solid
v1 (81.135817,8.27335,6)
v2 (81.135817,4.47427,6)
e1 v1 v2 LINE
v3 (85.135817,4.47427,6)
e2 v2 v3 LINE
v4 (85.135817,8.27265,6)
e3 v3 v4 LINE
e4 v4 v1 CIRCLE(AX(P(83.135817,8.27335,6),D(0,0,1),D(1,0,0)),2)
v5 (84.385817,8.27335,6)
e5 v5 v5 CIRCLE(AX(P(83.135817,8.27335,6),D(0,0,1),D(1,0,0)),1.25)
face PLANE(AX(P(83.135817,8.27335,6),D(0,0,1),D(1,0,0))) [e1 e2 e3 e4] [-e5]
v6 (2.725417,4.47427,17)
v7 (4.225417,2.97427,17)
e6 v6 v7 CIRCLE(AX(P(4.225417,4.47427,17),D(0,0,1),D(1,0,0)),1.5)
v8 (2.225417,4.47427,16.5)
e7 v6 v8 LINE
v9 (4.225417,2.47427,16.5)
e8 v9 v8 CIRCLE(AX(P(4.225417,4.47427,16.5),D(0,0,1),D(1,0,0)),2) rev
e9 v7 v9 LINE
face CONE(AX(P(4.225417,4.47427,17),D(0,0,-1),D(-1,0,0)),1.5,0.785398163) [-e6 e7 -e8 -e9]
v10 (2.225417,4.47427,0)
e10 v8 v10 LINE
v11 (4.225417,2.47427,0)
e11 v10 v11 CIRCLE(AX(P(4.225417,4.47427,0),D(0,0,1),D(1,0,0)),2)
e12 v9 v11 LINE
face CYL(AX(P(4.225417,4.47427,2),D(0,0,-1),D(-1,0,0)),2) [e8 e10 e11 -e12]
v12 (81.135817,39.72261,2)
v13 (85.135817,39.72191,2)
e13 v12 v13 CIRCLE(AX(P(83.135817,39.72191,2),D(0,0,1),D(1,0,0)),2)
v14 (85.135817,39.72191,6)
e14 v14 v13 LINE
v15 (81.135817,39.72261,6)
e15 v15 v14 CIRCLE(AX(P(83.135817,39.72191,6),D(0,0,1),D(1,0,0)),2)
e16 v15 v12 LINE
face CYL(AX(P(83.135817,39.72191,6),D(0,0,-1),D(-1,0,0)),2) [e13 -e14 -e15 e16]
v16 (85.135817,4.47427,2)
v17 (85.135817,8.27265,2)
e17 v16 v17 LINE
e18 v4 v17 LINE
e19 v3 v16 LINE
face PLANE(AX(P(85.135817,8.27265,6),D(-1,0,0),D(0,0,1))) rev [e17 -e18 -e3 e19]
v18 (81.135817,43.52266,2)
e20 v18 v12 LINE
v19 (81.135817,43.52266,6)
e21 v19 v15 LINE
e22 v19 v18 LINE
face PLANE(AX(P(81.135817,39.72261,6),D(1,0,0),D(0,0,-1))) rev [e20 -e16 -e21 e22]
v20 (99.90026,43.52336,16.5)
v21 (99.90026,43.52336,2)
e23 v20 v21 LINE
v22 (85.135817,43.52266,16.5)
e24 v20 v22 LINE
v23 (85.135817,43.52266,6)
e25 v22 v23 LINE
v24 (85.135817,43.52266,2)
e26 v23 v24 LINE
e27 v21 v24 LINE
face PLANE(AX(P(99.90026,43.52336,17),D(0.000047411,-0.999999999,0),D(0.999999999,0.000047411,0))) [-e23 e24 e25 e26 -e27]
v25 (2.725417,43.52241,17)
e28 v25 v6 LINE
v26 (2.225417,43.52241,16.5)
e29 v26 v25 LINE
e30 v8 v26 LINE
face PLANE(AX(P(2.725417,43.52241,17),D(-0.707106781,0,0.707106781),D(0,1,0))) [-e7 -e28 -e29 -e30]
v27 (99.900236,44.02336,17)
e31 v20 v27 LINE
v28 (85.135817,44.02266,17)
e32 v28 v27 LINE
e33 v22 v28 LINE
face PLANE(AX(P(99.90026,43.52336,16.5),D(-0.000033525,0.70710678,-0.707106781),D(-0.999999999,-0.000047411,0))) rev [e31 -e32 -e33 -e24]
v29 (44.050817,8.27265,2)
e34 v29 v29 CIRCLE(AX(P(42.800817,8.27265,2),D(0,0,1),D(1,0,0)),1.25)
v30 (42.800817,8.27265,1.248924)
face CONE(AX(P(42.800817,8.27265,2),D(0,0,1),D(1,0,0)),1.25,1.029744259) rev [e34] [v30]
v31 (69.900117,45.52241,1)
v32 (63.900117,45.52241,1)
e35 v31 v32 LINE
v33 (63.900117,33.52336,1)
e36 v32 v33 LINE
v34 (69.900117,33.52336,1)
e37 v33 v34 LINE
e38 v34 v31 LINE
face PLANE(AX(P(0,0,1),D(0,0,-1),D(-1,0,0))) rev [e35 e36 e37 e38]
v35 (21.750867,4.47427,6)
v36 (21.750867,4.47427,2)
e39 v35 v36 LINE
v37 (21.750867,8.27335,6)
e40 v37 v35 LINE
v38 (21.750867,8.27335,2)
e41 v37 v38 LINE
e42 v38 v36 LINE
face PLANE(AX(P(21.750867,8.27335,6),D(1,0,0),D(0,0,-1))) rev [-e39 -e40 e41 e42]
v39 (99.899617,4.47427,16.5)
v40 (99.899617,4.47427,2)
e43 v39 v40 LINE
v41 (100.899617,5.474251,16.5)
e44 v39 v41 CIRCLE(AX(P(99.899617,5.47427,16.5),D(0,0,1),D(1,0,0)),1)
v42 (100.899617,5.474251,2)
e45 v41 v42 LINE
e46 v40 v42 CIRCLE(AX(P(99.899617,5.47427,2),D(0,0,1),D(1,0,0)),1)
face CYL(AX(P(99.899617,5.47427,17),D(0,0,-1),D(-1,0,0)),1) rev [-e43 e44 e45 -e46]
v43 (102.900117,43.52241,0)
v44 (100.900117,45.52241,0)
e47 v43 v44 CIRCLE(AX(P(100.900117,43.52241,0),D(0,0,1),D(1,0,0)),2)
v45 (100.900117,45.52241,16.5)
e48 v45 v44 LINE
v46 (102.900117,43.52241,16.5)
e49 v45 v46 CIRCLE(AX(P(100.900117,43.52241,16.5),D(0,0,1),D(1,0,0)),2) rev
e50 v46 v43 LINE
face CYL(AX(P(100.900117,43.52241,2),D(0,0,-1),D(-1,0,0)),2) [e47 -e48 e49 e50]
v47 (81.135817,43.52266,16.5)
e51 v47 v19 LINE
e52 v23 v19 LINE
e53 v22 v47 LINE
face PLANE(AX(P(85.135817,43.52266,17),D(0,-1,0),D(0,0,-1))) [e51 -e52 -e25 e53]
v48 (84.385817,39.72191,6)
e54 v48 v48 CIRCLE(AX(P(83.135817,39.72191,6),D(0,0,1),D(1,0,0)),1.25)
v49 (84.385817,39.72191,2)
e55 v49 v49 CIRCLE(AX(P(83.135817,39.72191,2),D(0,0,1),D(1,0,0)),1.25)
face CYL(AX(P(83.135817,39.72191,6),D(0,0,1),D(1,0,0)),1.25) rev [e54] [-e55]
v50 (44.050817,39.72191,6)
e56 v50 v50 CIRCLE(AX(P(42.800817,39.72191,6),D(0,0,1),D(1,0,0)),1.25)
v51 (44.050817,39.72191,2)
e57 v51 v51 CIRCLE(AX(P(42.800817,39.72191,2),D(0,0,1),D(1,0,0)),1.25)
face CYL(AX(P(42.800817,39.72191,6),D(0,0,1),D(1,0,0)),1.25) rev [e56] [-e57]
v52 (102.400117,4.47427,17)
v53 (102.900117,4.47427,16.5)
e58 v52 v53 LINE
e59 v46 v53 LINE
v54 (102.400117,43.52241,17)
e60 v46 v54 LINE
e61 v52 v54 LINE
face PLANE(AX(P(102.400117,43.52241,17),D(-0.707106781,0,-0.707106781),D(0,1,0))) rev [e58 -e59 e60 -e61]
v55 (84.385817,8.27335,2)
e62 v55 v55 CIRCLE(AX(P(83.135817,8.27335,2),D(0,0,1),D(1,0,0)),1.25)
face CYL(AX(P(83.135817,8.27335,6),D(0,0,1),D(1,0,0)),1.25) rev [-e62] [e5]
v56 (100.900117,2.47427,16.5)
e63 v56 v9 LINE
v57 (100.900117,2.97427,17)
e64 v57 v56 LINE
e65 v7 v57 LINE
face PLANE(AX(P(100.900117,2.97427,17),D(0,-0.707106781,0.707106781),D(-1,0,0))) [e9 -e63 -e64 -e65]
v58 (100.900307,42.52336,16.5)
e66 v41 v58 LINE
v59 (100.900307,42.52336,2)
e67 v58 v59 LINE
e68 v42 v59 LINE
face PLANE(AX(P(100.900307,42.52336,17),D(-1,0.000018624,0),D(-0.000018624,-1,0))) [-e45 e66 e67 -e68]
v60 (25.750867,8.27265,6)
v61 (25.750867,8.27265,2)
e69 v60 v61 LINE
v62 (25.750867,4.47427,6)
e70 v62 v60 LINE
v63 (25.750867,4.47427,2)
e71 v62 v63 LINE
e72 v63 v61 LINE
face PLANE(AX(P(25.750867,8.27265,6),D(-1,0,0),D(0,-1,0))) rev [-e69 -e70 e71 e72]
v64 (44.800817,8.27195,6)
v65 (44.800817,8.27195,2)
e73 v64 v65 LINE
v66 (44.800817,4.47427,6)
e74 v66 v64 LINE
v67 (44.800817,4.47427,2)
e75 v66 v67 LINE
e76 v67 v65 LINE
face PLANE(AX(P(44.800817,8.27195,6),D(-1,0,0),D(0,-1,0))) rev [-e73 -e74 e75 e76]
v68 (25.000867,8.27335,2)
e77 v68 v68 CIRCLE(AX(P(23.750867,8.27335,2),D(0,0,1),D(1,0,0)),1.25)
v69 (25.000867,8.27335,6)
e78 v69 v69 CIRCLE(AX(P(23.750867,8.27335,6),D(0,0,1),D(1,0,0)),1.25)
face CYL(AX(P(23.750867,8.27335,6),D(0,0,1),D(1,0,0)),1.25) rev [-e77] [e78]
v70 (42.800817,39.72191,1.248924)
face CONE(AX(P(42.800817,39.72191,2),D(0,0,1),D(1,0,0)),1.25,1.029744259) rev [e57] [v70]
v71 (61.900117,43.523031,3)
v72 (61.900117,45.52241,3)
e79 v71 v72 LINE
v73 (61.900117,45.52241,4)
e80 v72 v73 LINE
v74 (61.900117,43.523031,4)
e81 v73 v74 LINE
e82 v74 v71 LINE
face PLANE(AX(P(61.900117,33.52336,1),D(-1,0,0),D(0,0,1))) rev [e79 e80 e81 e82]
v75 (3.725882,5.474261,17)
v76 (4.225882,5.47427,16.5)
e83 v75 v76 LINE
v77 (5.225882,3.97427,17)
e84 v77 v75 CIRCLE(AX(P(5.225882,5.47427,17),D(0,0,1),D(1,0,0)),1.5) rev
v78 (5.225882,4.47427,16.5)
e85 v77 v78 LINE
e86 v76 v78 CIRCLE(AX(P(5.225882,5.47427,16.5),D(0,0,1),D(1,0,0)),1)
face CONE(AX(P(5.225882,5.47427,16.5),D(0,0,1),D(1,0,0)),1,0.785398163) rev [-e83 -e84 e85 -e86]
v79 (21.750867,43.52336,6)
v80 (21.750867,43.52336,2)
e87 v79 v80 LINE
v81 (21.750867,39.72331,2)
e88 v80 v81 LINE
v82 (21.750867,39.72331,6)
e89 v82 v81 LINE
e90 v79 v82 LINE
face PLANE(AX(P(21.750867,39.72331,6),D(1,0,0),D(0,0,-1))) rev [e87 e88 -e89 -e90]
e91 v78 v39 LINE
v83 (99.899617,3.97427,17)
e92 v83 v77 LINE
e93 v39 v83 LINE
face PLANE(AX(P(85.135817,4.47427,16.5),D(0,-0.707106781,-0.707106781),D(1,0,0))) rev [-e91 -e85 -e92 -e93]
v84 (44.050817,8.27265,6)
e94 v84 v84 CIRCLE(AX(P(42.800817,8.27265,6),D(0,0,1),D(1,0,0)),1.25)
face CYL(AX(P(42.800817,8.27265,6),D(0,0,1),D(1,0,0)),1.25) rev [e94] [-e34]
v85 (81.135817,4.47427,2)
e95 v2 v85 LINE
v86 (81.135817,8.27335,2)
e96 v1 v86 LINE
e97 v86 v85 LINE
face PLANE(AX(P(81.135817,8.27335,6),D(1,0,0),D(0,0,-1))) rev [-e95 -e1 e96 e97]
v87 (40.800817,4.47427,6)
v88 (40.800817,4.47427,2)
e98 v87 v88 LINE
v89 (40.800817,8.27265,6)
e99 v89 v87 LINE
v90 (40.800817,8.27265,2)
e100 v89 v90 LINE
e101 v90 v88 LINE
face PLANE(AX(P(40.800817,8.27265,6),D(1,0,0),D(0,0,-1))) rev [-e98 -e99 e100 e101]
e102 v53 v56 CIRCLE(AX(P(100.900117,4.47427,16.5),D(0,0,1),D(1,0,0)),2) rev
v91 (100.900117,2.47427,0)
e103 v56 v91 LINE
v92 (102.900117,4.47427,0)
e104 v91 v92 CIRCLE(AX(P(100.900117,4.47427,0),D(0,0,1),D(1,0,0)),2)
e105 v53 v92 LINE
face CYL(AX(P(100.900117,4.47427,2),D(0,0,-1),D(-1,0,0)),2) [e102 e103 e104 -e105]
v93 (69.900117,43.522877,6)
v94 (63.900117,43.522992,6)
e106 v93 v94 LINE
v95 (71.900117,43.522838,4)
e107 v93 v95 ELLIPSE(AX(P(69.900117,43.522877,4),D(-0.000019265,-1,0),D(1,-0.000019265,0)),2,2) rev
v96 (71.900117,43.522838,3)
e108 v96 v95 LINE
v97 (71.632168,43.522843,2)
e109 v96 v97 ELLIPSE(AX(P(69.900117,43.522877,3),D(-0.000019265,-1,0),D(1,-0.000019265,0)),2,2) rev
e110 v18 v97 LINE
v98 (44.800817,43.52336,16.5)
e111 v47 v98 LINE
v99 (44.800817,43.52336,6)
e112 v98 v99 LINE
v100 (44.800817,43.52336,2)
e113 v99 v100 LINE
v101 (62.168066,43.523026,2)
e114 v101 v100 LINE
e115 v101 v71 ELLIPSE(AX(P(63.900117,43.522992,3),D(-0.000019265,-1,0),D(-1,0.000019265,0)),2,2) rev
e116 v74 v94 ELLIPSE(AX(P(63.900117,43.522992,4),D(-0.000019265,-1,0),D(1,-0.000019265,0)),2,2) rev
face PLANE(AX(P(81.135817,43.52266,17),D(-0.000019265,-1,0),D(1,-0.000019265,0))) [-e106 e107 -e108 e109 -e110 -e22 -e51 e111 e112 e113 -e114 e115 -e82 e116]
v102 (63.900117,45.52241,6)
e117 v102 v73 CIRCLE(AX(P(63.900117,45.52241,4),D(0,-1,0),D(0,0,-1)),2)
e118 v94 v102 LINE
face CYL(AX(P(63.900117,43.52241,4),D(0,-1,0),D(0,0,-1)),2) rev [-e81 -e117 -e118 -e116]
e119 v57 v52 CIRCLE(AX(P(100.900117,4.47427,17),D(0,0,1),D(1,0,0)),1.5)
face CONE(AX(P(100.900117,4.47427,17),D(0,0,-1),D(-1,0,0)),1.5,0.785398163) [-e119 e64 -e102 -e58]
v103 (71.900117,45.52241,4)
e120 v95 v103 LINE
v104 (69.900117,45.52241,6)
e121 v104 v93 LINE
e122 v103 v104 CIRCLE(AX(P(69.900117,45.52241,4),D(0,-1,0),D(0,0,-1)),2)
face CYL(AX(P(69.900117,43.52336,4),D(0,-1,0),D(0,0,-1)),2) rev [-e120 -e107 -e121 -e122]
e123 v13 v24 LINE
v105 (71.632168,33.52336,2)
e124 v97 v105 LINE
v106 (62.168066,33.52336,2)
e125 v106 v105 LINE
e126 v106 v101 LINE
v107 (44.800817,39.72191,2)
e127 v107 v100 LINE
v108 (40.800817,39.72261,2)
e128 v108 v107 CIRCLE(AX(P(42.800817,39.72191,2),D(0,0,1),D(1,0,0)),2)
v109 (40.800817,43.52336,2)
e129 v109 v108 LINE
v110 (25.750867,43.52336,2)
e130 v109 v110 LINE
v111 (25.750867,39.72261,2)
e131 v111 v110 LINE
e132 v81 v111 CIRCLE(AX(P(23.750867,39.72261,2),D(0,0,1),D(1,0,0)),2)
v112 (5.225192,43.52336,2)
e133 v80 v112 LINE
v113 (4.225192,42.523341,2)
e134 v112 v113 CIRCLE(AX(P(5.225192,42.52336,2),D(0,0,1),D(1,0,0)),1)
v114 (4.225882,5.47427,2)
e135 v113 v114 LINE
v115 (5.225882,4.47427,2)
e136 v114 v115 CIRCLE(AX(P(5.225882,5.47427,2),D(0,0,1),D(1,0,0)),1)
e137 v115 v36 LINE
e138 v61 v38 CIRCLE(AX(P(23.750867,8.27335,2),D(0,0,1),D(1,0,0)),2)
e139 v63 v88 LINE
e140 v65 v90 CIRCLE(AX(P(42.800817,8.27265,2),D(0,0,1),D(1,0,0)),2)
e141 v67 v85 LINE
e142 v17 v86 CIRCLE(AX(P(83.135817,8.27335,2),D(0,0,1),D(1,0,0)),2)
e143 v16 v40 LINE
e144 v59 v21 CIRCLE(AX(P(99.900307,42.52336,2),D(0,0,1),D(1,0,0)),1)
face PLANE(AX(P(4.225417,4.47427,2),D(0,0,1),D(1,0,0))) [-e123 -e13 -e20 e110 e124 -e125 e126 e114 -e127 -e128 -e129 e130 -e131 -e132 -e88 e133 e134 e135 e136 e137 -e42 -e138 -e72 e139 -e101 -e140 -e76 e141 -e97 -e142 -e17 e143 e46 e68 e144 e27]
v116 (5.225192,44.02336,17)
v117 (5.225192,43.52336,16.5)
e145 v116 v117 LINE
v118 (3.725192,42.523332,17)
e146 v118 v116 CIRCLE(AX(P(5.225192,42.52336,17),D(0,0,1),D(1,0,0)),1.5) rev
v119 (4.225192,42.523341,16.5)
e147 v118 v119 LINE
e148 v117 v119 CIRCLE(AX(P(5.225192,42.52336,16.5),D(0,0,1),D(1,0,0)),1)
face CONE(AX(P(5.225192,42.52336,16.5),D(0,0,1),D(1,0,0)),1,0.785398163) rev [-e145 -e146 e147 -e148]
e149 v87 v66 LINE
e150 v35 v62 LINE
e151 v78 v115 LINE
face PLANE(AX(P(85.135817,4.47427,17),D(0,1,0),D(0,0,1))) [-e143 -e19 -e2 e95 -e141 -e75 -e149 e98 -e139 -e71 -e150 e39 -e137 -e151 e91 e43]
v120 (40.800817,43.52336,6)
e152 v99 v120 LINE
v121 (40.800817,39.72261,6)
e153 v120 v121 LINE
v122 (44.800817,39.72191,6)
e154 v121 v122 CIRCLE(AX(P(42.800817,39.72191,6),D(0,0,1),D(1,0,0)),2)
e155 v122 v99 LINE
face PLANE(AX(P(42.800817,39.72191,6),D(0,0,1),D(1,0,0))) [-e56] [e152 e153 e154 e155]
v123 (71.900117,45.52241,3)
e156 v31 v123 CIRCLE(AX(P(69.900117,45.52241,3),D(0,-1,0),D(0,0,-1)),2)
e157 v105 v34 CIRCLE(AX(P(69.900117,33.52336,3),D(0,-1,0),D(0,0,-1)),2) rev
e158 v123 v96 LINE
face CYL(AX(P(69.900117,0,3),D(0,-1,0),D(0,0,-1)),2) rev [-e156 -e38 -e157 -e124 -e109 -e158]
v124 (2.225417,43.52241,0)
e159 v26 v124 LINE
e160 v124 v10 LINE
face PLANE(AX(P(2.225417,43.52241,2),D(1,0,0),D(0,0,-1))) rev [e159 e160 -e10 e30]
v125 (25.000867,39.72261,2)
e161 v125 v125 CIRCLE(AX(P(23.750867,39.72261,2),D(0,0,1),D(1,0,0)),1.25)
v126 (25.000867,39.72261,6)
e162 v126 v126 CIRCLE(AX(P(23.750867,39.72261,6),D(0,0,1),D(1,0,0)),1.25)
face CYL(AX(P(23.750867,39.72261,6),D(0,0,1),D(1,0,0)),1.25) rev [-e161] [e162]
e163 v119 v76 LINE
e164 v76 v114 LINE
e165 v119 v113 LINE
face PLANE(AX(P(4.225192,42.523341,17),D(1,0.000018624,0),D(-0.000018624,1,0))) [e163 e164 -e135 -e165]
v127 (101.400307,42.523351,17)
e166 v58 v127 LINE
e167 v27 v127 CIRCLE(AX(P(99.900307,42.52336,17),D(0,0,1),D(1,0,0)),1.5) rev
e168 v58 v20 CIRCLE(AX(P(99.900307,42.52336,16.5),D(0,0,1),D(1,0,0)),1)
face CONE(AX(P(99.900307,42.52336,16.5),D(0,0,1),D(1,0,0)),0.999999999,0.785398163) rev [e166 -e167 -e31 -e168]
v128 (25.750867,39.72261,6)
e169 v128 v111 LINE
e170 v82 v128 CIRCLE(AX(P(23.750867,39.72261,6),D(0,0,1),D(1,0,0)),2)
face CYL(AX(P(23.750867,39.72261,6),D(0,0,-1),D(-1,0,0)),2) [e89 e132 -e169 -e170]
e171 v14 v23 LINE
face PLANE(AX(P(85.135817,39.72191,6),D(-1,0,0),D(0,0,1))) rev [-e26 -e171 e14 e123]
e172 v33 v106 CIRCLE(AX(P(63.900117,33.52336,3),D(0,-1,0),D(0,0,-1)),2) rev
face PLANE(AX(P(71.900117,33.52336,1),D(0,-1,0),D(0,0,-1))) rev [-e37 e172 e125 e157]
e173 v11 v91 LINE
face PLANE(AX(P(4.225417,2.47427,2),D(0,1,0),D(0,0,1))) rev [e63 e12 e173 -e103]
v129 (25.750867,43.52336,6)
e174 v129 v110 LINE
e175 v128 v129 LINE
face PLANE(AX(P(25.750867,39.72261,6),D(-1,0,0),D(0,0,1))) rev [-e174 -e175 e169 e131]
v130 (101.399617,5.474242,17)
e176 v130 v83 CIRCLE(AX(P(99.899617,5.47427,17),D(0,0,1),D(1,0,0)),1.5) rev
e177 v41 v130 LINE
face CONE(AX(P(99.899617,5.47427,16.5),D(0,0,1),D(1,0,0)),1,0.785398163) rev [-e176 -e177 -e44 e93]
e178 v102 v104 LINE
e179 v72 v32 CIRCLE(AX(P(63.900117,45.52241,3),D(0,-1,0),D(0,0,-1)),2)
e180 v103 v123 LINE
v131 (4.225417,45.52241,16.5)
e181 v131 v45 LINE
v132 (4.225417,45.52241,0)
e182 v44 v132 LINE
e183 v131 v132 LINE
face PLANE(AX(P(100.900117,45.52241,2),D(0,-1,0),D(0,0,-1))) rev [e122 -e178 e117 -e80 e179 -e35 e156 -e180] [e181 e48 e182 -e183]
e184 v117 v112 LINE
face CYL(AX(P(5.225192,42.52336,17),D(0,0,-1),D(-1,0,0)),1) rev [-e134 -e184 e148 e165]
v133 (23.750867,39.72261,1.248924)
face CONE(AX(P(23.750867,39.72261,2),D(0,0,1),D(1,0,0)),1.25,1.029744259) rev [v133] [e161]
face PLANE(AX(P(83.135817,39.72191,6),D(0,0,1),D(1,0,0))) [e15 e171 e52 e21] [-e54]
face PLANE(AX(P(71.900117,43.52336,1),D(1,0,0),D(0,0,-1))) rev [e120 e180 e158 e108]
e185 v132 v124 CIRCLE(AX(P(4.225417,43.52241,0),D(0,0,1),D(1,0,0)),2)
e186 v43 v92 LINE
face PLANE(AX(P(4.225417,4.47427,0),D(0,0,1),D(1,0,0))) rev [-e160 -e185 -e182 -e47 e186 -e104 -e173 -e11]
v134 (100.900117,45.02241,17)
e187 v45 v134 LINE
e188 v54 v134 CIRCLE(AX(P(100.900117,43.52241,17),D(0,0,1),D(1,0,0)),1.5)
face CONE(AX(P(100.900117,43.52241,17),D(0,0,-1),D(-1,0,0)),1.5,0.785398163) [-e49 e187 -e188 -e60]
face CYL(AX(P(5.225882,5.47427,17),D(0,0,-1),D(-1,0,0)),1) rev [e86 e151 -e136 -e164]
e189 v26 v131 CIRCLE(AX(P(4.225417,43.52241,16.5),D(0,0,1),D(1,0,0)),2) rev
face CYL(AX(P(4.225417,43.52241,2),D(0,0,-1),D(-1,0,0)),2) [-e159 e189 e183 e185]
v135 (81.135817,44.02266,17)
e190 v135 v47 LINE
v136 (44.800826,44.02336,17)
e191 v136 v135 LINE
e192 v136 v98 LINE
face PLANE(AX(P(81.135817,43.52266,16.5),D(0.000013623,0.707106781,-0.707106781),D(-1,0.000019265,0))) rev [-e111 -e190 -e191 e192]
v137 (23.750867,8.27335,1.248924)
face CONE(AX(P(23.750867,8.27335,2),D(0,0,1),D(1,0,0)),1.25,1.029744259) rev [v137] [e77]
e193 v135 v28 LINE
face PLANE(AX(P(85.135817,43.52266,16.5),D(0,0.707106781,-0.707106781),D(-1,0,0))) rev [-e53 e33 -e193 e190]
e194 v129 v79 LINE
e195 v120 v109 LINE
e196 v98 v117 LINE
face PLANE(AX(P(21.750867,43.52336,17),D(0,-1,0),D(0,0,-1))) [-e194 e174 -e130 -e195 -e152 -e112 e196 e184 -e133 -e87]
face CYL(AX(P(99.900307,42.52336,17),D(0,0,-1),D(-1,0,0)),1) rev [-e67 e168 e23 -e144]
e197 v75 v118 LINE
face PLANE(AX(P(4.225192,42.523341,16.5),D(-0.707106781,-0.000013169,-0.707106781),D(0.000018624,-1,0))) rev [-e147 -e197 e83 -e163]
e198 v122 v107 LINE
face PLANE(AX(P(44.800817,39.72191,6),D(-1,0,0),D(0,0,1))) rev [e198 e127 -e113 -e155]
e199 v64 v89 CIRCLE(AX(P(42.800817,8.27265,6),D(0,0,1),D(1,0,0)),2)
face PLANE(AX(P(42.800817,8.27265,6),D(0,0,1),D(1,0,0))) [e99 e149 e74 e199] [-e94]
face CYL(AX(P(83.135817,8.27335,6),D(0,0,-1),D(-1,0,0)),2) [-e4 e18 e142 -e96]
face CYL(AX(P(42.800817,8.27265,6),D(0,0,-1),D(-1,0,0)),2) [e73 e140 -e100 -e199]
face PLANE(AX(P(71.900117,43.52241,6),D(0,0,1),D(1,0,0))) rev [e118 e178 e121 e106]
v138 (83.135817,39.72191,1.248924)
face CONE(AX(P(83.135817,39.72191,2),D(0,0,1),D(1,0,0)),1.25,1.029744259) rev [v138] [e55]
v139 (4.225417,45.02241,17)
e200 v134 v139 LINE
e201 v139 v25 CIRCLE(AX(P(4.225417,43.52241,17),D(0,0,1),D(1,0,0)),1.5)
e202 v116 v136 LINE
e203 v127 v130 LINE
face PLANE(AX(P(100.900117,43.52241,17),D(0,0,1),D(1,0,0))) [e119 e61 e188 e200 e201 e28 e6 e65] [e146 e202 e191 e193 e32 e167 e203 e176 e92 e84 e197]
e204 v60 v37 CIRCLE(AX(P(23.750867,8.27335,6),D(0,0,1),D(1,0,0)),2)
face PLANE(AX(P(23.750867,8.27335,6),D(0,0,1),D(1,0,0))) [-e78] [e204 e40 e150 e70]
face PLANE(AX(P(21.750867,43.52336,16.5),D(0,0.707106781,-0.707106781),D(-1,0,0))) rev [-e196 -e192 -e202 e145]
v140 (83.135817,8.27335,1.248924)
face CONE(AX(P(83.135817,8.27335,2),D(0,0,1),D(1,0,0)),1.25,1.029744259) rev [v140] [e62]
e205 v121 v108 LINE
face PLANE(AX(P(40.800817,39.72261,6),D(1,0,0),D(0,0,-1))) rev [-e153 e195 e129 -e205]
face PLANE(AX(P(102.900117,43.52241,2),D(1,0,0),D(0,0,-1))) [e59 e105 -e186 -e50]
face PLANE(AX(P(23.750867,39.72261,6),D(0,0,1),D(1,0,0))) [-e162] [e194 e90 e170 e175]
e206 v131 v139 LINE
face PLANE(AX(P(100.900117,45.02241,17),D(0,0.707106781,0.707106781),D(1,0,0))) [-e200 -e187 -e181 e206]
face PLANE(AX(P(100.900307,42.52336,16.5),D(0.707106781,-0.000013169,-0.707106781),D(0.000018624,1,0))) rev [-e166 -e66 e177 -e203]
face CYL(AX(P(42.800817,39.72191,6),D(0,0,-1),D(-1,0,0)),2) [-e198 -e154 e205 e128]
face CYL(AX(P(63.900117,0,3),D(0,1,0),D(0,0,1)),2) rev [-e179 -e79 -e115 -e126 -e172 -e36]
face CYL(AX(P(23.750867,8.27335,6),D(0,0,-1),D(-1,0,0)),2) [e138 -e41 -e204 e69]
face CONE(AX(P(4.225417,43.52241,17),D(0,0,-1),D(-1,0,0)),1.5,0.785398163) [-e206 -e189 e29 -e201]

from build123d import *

# Parameters (mm, degrees)
EXTRUDE_1_DEPTH     = 2
SKETCH_2_W          = 10
SKETCH_2_H          = 10
CUT_EXTRUDE_1_DEPTH = 1
EXTRUDE_2_DEPTH     = 15
EXTRUDE_3_DEPTH     = 4
MM_2_D              = 2.5
MM_2_DEPTH          = 4
MM_2_TIP            = 0.751075774
SKETCH_9_W          = 10
SKETCH_9_H          = 5
CUT_EXTRUDE_2_DEPTH = 2
FILLET_1_R          = 2
CHAMFER_1_SIZE      = 0.5


with BuildPart() as part:
    # 草图1 → 凸台-拉伸1 (new body)
    with BuildSketch(Plane.XY):
        with BuildLine():
            Line((2.225416965, 43.522410124), (2.225416965, 4.474270124))
            ThreePointArc((2.225416965, 4.474270124), (2.811203402, 3.060056561), (4.225416965, 2.474270124))
            Line((4.225416965, 2.474270124), (100.900116965, 2.474270124))
            ThreePointArc((100.900116965, 2.474270124), (102.314330527, 3.060056561), (102.900116965, 4.474270124))
            Line((102.900116965, 4.474270124), (102.900116965, 43.522410124))
            ThreePointArc((102.900116965, 43.522410124), (102.314330527, 44.936623686), (100.900116965, 45.522410124))
            Line((100.900116965, 45.522410124), (4.225416965, 45.522410124))
            ThreePointArc((4.225416965, 45.522410124), (2.811203402, 44.936623686), (2.225416965, 43.522410124))
        make_face()
    extrude(amount=EXTRUDE_1_DEPTH)

    # 草图2 → 切除-拉伸1 (cut)
    with BuildSketch(Plane.XY.offset(2)):
        with Locations((66.900116965, 38.523360124)):
            Rectangle(SKETCH_2_W, SKETCH_2_H)
    extrude(amount=-CUT_EXTRUDE_1_DEPTH, mode=Mode.SUBTRACT)

    # 草图3 → 凸台-拉伸2 (add)
    with BuildSketch(Plane.XY.offset(2)):
        with BuildLine():
            Line((100.900116965, 45.522410124), (4.225416965, 45.522410124))
            ThreePointArc((4.225416965, 45.522410124), (2.811203402, 44.936623686), (2.225416965, 43.522410124))
            Line((2.225416965, 43.522410124), (2.225416965, 4.474270124))
            ThreePointArc((2.225416965, 4.474270124), (2.811203402, 3.060056561), (4.225416965, 2.474270124))
            Line((4.225416965, 2.474270124), (100.900116965, 2.474270124))
            ThreePointArc((100.900116965, 2.474270124), (102.314330527, 3.060056561), (102.900116965, 4.474270124))
            Line((102.900116965, 4.474270124), (102.900116965, 43.522410124))
            ThreePointArc((102.900116965, 43.522410124), (102.314330527, 44.936623686), (100.900116965, 45.522410124))
        make_face()
        with BuildLine():
            Line((99.900259554, 43.523360121), (85.135816842, 43.522660124))
            Line((85.135816842, 43.522660124), (81.135817087, 43.522660124))
            Line((81.135817087, 43.522660124), (44.800816842, 43.523360124))
            Line((44.800816842, 43.523360124), (40.800817087, 43.523360124))
            Line((40.800817087, 43.523360124), (25.750866842, 43.523360124))
            Line((25.750866842, 43.523360124), (21.750867087, 43.523360124))
            Line((21.750867087, 43.523360124), (5.225191965, 43.523360124))
            ThreePointArc((5.225191965, 43.523360124), (4.518078599, 43.23046032), (4.225191965, 42.5233415))
            Line((4.225191965, 42.5233415), (4.225881965, 5.474270124))
            ThreePointArc((4.225881965, 5.474270124), (4.518775184, 4.767163343), (5.225881965, 4.474270124))
            Line((5.225881965, 4.474270124), (21.750867087, 4.474270124))
            Line((21.750867087, 4.474270124), (25.750866842, 4.474270124))
            Line((25.750866842, 4.474270124), (40.800817087, 4.474270124))
            Line((40.800817087, 4.474270124), (44.800816842, 4.474270124))
            Line((44.800816842, 4.474270124), (81.135817087, 4.474270124))
            Line((81.135817087, 4.474270124), (85.135816842, 4.474270124))
            Line((85.135816842, 4.474270124), (99.899616965, 4.474270124))
            ThreePointArc((99.899616965, 4.474270124), (100.606717161, 4.767156758), (100.899616964, 5.4742515))
            Line((100.899616964, 5.4742515), (100.900306965, 42.523360124))
            ThreePointArc((100.900306965, 42.523360124), (100.607396983, 43.230483666), (99.900259554, 43.523360121))
        make_face(mode=Mode.SUBTRACT)
    extrude(amount=EXTRUDE_2_DEPTH)

    # 草图4 → 凸台-拉伸3 (add)
    with BuildSketch(Plane.XY.offset(2)):
        with BuildLine():
            Line((21.750867087, 39.723310124), (21.750867087, 43.523360124))
            Line((21.750867087, 43.523360124), (25.750866842, 43.523360124))
            Line((25.750866842, 43.523360124), (25.750866842, 39.722610124))
            ThreePointArc((25.750866842, 39.722610124), (23.750516904, 37.722610216), (21.750867087, 39.723310124))
        make_face()
        with BuildLine():
            Line((40.800817087, 39.722610124), (40.800817087, 43.523360124))
            Line((40.800817087, 43.523360124), (44.800816842, 43.523360124))
            Line((44.800816842, 43.523360124), (44.800816842, 39.721910124))
            ThreePointArc((44.800816842, 39.721910124), (42.800466904, 37.721910216), (40.800817087, 39.722610124))
        make_face()
        with BuildLine():
            Line((81.135817087, 39.722610124), (81.135817087, 43.522660124))
            Line((81.135817087, 43.522660124), (85.135816842, 43.522660124))
            Line((85.135816842, 43.522660124), (85.135816842, 39.721910124))
            ThreePointArc((85.135816842, 39.721910124), (83.135466904, 37.721910216), (81.135817087, 39.722610124))
        make_face()
        with BuildLine():
            Line((21.750867087, 8.273350124), (21.750867087, 4.474270124))
            Line((21.750867087, 4.474270124), (25.750866842, 4.474270124))
            Line((25.750866842, 4.474270124), (25.750866842, 8.272650124))
            ThreePointArc((25.750866842, 8.272650124), (23.751217026, 10.273350032), (21.750867087, 8.273350124))
        make_face()
        with BuildLine():
            Line((40.800817087, 8.272650124), (40.800817087, 4.474270124))
            Line((40.800817087, 4.474270124), (44.800816842, 4.474270124))
            Line((44.800816842, 4.474270124), (44.800816842, 8.271950124))
            ThreePointArc((44.800816842, 8.271950124), (42.801167026, 10.272650032), (40.800817087, 8.272650124))
        make_face()
        with BuildLine():
            Line((81.135817087, 8.273350124), (81.135817087, 4.474270124))
            Line((81.135817087, 4.474270124), (85.135816842, 4.474270124))
            Line((85.135816842, 4.474270124), (85.135816842, 8.272650124))
            ThreePointArc((85.135816842, 8.272650124), (83.136167026, 10.273350032), (81.135817087, 8.273350124))
        make_face()
    extrude(amount=EXTRUDE_3_DEPTH)

    # 大小mm 暗销孔2
    with Locations(Plane(origin=(23.750866904, 39.722610124, 6), x_dir=(1, 0, 0), z_dir=(0, 0, 1))):
        with Locations((0, 0), (19.04995, -0.0007), (59.38495, -0.0007), (59.384950122, -31.44926), (19.049950122, -31.44996), (1.22e-07, -31.44926)):
            Hole(MM_2_D / 2, depth=MM_2_DEPTH)
            with Locations((0, 0, -(MM_2_DEPTH + MM_2_TIP / 2))):  # 118° drill point
                Cone(0, MM_2_D / 2, MM_2_TIP, mode=Mode.SUBTRACT)

    # 草图9 → 切除-拉伸2 (cut)
    with BuildSketch(Plane(origin=(0, 45.522410124, 0), x_dir=(1, 0, 0), z_dir=(0, 1, 0))):
        with Locations((66.900116965, -3.5)):
            Rectangle(SKETCH_9_W, SKETCH_9_H)
    extrude(amount=-CUT_EXTRUDE_2_DEPTH, mode=Mode.SUBTRACT)

    # 圆角1
    # the kernel refuses this fillet: 2 mm, written as the material it adds along each edge
    with BuildSketch(Plane(origin=(61.900116965, 45.522410124, 6), x_dir=(0, 0, -1), z_dir=(0, -1, 0))) as fillet_1_piece_1_section:
        with BuildLine():
            CenterArc((FILLET_1_R, FILLET_1_R), FILLET_1_R, 180, 90)
            Line((0, FILLET_1_R), (0, 0))
            Line((0, 0), (FILLET_1_R, 0))
        make_face()
    fillet_1_piece_1 = extrude(amount=6.999379421, mode=Mode.PRIVATE)
    fillet_1_piece_1 = split(fillet_1_piece_1, bisect_by=Plane(origin=(62.352889725, 43.52302198, 5.54721083), z_dir=(1.9265171188797207e-05, 0.9999999998144267, 0)), keep=Keep.TOP, mode=Mode.PRIVATE)
    add(fillet_1_piece_1)
    with BuildSketch(Plane(origin=(71.900116965, 45.522410124, 6), x_dir=(-1, 0, 0), z_dir=(0, -1, 0))) as fillet_1_piece_2_section:
        with BuildLine():
            CenterArc((FILLET_1_R, FILLET_1_R), FILLET_1_R, 180, 90)
            Line((0, FILLET_1_R), (0, 0))
            Line((0, 0), (FILLET_1_R, 0))
        make_face()
    fillet_1_piece_2 = extrude(amount=6.999572073, mode=Mode.PRIVATE)
    fillet_1_piece_2 = split(fillet_1_piece_2, bisect_by=Plane(origin=(71.447309266, 43.522846774, 5.547208713), z_dir=(1.9265171188797207e-05, 0.9999999998144267, 0)), keep=Keep.TOP, mode=Mode.PRIVATE)
    add(fillet_1_piece_2)
    with BuildSketch(Plane(origin=(71.900116965, 28.523360124, 1), x_dir=(0, 0, 1), z_dir=(0, 1, 0))) as fillet_1_piece_3_section:
        with BuildLine():
            CenterArc((FILLET_1_R, -FILLET_1_R), FILLET_1_R, 90, 90)
            Line((0, -FILLET_1_R), (0, 0))
            Line((0, 0), (FILLET_1_R, 0))
        make_face()
    fillet_1_piece_3 = extrude(amount=16.99905, mode=Mode.PRIVATE)
    fillet_1_piece_3 = split(fillet_1_piece_3, bisect_by=Plane(origin=(71.389876845, 33.523360124, 1.328783529), z_dir=(0, -1, 0)), keep=Keep.TOP, mode=Mode.PRIVATE)
    fillet_1_piece_3 = split(fillet_1_piece_3, bisect_by=Plane(origin=(71.389876845, 31.023360124, 2), z_dir=(0, 0, -1)), keep=Keep.TOP, mode=Mode.PRIVATE)
    add(fillet_1_piece_3)
    with BuildSketch(Plane(origin=(71.900116965, 33.523360124, 1), x_dir=(0, 0, 1), z_dir=(0, 1, 0))) as fillet_1_piece_4_section:
        with BuildLine():
            CenterArc((FILLET_1_R, -FILLET_1_R), FILLET_1_R, 90, 90)
            Line((0, -FILLET_1_R), (0, 0))
            Line((0, 0), (FILLET_1_R, 0))
        make_face()
    fillet_1_piece_4 = extrude(amount=11.99905, mode=Mode.PRIVATE)
    fillet_1_piece_4 = split(fillet_1_piece_4, bisect_by=Plane(origin=(71.389876488, 38.523104002, 2), z_dir=(0, 0, -1)), keep=Keep.TOP, mode=Mode.PRIVATE)
    fillet_1_piece_4 = split(fillet_1_piece_4, bisect_by=Plane(origin=(71.389972809, 43.522847879, 1.3287834), z_dir=(-1.9265171188797207e-05, -0.9999999998144267, 0)), keep=Keep.TOP, mode=Mode.PRIVATE)
    add(fillet_1_piece_4)
    with BuildSketch(Plane(origin=(71.900116965, 33.523360124, 1), x_dir=(0, 0, 1), z_dir=(0, 1, 0))) as fillet_1_piece_5_section:
        with BuildLine():
            CenterArc((FILLET_1_R, -FILLET_1_R), FILLET_1_R, 90, 90)
            Line((0, -FILLET_1_R), (0, 0))
            Line((0, 0), (FILLET_1_R, 0))
        make_face()
    fillet_1_piece_5 = extrude(amount=11.99905, mode=Mode.PRIVATE)
    fillet_1_piece_5 = split(fillet_1_piece_5, bisect_by=Plane(origin=(71.852100247, 44.52262455, 2), z_dir=(0, 0, 1)), keep=Keep.TOP, mode=Mode.PRIVATE)
    fillet_1_piece_5 = split(fillet_1_piece_5, bisect_by=Plane(origin=(71.852080986, 43.522838976, 2.326501665), z_dir=(1.9265171188797207e-05, 0.9999999998144267, 0)), keep=Keep.TOP, mode=Mode.PRIVATE)
    add(fillet_1_piece_5)
    with BuildSketch(Plane(origin=(71.900116965, 33.523360124, 1), x_dir=(0, 0, 1), z_dir=(0, 1, 0))) as fillet_1_piece_6_section:
        with BuildLine():
            CenterArc((FILLET_1_R, -FILLET_1_R), FILLET_1_R, 90, 90)
            Line((0, -FILLET_1_R), (0, 0))
            Line((0, 0), (FILLET_1_R, 0))
        make_face()
    fillet_1_piece_6 = extrude(amount=11.99905, mode=Mode.PRIVATE)
    fillet_1_piece_6 = split(fillet_1_piece_6, bisect_by=Plane(origin=(71.389878628, 44.522629002, 2), z_dir=(0, 0, -1)), keep=Keep.TOP, mode=Mode.PRIVATE)
    fillet_1_piece_6 = split(fillet_1_piece_6, bisect_by=Plane(origin=(71.389859367, 43.522847881, 1.328784171), z_dir=(1.9265171188797207e-05, 0.9999999998144267, 0)), keep=Keep.TOP, mode=Mode.PRIVATE)
    add(fillet_1_piece_6)
    with BuildSketch(Plane(origin=(61.900116965, 45.522410124, 1), x_dir=(0, 0, 1), z_dir=(0, -1, 0))) as fillet_1_piece_7_section:
        with BuildLine():
            CenterArc((FILLET_1_R, -FILLET_1_R), FILLET_1_R, 90, 90)
            Line((0, -FILLET_1_R), (0, 0))
            Line((0, 0), (FILLET_1_R, 0))
        make_face()
    fillet_1_piece_7 = extrude(amount=11.99905, mode=Mode.PRIVATE)
    fillet_1_piece_7 = split(fillet_1_piece_7, bisect_by=Plane(origin=(61.948114515, 43.523029778, 2.326501473), z_dir=(1.9265171188797207e-05, 0.9999999998144267, 0)), keep=Keep.TOP, mode=Mode.PRIVATE)
    fillet_1_piece_7 = split(fillet_1_piece_7, bisect_by=Plane(origin=(61.948133774, 44.522719951, 2), z_dir=(0, 0, 1)), keep=Keep.TOP, mode=Mode.PRIVATE)
    add(fillet_1_piece_7)
    with BuildSketch(Plane(origin=(61.900116965, 45.522410124, 1), x_dir=(0, 0, 1), z_dir=(0, -1, 0))) as fillet_1_piece_8_section:
        with BuildLine():
            CenterArc((FILLET_1_R, -FILLET_1_R), FILLET_1_R, 90, 90)
            Line((0, -FILLET_1_R), (0, 0))
            Line((0, 0), (FILLET_1_R, 0))
        make_face()
    fillet_1_piece_8 = extrude(amount=11.99905, mode=Mode.PRIVATE)
    fillet_1_piece_8 = split(fillet_1_piece_8, bisect_by=Plane(origin=(62.410339609, 43.523020873, 1.328782886), z_dir=(1.9265171188797207e-05, 0.9999999998144267, 0)), keep=Keep.TOP, mode=Mode.PRIVATE)
    fillet_1_piece_8 = split(fillet_1_piece_8, bisect_by=Plane(origin=(62.410358868, 44.522715498, 2), z_dir=(0, 0, -1)), keep=Keep.TOP, mode=Mode.PRIVATE)
    add(fillet_1_piece_8)
    with BuildSketch(Plane(origin=(61.900116965, 45.522410124, 1), x_dir=(0, 0, 1), z_dir=(0, -1, 0))) as fillet_1_piece_9_section:
        with BuildLine():
            CenterArc((FILLET_1_R, -FILLET_1_R), FILLET_1_R, 90, 90)
            Line((0, -FILLET_1_R), (0, 0))
            Line((0, 0), (FILLET_1_R, 0))
        make_face()
    fillet_1_piece_9 = extrude(amount=11.99905, mode=Mode.PRIVATE)
    fillet_1_piece_9 = split(fillet_1_piece_9, bisect_by=Plane(origin=(62.410453051, 43.523020871, 1.328783657), z_dir=(-1.9265171188797207e-05, -0.9999999998144267, 0)), keep=Keep.TOP, mode=Mode.PRIVATE)
    fillet_1_piece_9 = split(fillet_1_piece_9, bisect_by=Plane(origin=(62.410356728, 38.523190498, 2), z_dir=(0, 0, -1)), keep=Keep.TOP, mode=Mode.PRIVATE)
    add(fillet_1_piece_9)
    with BuildSketch(Plane(origin=(61.900116965, 45.522410124, 1), x_dir=(0, 0, 1), z_dir=(0, -1, 0))) as fillet_1_piece_10_section:
        with BuildLine():
            CenterArc((FILLET_1_R, -FILLET_1_R), FILLET_1_R, 90, 90)
            Line((0, -FILLET_1_R), (0, 0))
            Line((0, 0), (FILLET_1_R, 0))
        make_face()
    fillet_1_piece_10 = extrude(amount=16.99905, mode=Mode.PRIVATE)
    fillet_1_piece_10 = split(fillet_1_piece_10, bisect_by=Plane(origin=(62.410357085, 31.023360124, 2), z_dir=(0, 0, -1)), keep=Keep.TOP, mode=Mode.PRIVATE)
    fillet_1_piece_10 = split(fillet_1_piece_10, bisect_by=Plane(origin=(62.410357085, 33.523360124, 1.328783529), z_dir=(0, -1, 0)), keep=Keep.TOP, mode=Mode.PRIVATE)
    add(fillet_1_piece_10)

    # 倒角1
    chamfer_1_edges = [part.edges().sort_by_distance(p)[0] for p in [
        (102.314330527, 44.936623686, 17),
        (52.562766965, 45.522410124, 17),
        (2.811203402, 44.936623686, 17),
        (2.225416965, 23.998340124, 17),
        (2.811203402, 3.060056561, 17),
        (52.562766965, 2.474270124, 17),
        (102.314330527, 3.060056561, 17),
        (102.900116965, 23.998340124, 17),
        (100.607396983, 43.230483666, 17),
        (92.518038198, 43.523010123, 17),
        (83.135816965, 43.522660124, 17),
        (62.968316965, 43.523010124, 17),
        (25.013004404, 43.523360124, 17),
        (4.518078599, 43.23046032, 17),
        (4.225536965, 23.998805812, 17),
        (4.518775184, 4.767163343, 17),
        (52.562749465, 4.474270124, 17),
        (100.606717161, 4.767156758, 17),
        (100.899961965, 23.998805812, 17),
    ]]
    chamfer(chamfer_1_edges, length=CHAMFER_1_SIZE)


solid = part.part
